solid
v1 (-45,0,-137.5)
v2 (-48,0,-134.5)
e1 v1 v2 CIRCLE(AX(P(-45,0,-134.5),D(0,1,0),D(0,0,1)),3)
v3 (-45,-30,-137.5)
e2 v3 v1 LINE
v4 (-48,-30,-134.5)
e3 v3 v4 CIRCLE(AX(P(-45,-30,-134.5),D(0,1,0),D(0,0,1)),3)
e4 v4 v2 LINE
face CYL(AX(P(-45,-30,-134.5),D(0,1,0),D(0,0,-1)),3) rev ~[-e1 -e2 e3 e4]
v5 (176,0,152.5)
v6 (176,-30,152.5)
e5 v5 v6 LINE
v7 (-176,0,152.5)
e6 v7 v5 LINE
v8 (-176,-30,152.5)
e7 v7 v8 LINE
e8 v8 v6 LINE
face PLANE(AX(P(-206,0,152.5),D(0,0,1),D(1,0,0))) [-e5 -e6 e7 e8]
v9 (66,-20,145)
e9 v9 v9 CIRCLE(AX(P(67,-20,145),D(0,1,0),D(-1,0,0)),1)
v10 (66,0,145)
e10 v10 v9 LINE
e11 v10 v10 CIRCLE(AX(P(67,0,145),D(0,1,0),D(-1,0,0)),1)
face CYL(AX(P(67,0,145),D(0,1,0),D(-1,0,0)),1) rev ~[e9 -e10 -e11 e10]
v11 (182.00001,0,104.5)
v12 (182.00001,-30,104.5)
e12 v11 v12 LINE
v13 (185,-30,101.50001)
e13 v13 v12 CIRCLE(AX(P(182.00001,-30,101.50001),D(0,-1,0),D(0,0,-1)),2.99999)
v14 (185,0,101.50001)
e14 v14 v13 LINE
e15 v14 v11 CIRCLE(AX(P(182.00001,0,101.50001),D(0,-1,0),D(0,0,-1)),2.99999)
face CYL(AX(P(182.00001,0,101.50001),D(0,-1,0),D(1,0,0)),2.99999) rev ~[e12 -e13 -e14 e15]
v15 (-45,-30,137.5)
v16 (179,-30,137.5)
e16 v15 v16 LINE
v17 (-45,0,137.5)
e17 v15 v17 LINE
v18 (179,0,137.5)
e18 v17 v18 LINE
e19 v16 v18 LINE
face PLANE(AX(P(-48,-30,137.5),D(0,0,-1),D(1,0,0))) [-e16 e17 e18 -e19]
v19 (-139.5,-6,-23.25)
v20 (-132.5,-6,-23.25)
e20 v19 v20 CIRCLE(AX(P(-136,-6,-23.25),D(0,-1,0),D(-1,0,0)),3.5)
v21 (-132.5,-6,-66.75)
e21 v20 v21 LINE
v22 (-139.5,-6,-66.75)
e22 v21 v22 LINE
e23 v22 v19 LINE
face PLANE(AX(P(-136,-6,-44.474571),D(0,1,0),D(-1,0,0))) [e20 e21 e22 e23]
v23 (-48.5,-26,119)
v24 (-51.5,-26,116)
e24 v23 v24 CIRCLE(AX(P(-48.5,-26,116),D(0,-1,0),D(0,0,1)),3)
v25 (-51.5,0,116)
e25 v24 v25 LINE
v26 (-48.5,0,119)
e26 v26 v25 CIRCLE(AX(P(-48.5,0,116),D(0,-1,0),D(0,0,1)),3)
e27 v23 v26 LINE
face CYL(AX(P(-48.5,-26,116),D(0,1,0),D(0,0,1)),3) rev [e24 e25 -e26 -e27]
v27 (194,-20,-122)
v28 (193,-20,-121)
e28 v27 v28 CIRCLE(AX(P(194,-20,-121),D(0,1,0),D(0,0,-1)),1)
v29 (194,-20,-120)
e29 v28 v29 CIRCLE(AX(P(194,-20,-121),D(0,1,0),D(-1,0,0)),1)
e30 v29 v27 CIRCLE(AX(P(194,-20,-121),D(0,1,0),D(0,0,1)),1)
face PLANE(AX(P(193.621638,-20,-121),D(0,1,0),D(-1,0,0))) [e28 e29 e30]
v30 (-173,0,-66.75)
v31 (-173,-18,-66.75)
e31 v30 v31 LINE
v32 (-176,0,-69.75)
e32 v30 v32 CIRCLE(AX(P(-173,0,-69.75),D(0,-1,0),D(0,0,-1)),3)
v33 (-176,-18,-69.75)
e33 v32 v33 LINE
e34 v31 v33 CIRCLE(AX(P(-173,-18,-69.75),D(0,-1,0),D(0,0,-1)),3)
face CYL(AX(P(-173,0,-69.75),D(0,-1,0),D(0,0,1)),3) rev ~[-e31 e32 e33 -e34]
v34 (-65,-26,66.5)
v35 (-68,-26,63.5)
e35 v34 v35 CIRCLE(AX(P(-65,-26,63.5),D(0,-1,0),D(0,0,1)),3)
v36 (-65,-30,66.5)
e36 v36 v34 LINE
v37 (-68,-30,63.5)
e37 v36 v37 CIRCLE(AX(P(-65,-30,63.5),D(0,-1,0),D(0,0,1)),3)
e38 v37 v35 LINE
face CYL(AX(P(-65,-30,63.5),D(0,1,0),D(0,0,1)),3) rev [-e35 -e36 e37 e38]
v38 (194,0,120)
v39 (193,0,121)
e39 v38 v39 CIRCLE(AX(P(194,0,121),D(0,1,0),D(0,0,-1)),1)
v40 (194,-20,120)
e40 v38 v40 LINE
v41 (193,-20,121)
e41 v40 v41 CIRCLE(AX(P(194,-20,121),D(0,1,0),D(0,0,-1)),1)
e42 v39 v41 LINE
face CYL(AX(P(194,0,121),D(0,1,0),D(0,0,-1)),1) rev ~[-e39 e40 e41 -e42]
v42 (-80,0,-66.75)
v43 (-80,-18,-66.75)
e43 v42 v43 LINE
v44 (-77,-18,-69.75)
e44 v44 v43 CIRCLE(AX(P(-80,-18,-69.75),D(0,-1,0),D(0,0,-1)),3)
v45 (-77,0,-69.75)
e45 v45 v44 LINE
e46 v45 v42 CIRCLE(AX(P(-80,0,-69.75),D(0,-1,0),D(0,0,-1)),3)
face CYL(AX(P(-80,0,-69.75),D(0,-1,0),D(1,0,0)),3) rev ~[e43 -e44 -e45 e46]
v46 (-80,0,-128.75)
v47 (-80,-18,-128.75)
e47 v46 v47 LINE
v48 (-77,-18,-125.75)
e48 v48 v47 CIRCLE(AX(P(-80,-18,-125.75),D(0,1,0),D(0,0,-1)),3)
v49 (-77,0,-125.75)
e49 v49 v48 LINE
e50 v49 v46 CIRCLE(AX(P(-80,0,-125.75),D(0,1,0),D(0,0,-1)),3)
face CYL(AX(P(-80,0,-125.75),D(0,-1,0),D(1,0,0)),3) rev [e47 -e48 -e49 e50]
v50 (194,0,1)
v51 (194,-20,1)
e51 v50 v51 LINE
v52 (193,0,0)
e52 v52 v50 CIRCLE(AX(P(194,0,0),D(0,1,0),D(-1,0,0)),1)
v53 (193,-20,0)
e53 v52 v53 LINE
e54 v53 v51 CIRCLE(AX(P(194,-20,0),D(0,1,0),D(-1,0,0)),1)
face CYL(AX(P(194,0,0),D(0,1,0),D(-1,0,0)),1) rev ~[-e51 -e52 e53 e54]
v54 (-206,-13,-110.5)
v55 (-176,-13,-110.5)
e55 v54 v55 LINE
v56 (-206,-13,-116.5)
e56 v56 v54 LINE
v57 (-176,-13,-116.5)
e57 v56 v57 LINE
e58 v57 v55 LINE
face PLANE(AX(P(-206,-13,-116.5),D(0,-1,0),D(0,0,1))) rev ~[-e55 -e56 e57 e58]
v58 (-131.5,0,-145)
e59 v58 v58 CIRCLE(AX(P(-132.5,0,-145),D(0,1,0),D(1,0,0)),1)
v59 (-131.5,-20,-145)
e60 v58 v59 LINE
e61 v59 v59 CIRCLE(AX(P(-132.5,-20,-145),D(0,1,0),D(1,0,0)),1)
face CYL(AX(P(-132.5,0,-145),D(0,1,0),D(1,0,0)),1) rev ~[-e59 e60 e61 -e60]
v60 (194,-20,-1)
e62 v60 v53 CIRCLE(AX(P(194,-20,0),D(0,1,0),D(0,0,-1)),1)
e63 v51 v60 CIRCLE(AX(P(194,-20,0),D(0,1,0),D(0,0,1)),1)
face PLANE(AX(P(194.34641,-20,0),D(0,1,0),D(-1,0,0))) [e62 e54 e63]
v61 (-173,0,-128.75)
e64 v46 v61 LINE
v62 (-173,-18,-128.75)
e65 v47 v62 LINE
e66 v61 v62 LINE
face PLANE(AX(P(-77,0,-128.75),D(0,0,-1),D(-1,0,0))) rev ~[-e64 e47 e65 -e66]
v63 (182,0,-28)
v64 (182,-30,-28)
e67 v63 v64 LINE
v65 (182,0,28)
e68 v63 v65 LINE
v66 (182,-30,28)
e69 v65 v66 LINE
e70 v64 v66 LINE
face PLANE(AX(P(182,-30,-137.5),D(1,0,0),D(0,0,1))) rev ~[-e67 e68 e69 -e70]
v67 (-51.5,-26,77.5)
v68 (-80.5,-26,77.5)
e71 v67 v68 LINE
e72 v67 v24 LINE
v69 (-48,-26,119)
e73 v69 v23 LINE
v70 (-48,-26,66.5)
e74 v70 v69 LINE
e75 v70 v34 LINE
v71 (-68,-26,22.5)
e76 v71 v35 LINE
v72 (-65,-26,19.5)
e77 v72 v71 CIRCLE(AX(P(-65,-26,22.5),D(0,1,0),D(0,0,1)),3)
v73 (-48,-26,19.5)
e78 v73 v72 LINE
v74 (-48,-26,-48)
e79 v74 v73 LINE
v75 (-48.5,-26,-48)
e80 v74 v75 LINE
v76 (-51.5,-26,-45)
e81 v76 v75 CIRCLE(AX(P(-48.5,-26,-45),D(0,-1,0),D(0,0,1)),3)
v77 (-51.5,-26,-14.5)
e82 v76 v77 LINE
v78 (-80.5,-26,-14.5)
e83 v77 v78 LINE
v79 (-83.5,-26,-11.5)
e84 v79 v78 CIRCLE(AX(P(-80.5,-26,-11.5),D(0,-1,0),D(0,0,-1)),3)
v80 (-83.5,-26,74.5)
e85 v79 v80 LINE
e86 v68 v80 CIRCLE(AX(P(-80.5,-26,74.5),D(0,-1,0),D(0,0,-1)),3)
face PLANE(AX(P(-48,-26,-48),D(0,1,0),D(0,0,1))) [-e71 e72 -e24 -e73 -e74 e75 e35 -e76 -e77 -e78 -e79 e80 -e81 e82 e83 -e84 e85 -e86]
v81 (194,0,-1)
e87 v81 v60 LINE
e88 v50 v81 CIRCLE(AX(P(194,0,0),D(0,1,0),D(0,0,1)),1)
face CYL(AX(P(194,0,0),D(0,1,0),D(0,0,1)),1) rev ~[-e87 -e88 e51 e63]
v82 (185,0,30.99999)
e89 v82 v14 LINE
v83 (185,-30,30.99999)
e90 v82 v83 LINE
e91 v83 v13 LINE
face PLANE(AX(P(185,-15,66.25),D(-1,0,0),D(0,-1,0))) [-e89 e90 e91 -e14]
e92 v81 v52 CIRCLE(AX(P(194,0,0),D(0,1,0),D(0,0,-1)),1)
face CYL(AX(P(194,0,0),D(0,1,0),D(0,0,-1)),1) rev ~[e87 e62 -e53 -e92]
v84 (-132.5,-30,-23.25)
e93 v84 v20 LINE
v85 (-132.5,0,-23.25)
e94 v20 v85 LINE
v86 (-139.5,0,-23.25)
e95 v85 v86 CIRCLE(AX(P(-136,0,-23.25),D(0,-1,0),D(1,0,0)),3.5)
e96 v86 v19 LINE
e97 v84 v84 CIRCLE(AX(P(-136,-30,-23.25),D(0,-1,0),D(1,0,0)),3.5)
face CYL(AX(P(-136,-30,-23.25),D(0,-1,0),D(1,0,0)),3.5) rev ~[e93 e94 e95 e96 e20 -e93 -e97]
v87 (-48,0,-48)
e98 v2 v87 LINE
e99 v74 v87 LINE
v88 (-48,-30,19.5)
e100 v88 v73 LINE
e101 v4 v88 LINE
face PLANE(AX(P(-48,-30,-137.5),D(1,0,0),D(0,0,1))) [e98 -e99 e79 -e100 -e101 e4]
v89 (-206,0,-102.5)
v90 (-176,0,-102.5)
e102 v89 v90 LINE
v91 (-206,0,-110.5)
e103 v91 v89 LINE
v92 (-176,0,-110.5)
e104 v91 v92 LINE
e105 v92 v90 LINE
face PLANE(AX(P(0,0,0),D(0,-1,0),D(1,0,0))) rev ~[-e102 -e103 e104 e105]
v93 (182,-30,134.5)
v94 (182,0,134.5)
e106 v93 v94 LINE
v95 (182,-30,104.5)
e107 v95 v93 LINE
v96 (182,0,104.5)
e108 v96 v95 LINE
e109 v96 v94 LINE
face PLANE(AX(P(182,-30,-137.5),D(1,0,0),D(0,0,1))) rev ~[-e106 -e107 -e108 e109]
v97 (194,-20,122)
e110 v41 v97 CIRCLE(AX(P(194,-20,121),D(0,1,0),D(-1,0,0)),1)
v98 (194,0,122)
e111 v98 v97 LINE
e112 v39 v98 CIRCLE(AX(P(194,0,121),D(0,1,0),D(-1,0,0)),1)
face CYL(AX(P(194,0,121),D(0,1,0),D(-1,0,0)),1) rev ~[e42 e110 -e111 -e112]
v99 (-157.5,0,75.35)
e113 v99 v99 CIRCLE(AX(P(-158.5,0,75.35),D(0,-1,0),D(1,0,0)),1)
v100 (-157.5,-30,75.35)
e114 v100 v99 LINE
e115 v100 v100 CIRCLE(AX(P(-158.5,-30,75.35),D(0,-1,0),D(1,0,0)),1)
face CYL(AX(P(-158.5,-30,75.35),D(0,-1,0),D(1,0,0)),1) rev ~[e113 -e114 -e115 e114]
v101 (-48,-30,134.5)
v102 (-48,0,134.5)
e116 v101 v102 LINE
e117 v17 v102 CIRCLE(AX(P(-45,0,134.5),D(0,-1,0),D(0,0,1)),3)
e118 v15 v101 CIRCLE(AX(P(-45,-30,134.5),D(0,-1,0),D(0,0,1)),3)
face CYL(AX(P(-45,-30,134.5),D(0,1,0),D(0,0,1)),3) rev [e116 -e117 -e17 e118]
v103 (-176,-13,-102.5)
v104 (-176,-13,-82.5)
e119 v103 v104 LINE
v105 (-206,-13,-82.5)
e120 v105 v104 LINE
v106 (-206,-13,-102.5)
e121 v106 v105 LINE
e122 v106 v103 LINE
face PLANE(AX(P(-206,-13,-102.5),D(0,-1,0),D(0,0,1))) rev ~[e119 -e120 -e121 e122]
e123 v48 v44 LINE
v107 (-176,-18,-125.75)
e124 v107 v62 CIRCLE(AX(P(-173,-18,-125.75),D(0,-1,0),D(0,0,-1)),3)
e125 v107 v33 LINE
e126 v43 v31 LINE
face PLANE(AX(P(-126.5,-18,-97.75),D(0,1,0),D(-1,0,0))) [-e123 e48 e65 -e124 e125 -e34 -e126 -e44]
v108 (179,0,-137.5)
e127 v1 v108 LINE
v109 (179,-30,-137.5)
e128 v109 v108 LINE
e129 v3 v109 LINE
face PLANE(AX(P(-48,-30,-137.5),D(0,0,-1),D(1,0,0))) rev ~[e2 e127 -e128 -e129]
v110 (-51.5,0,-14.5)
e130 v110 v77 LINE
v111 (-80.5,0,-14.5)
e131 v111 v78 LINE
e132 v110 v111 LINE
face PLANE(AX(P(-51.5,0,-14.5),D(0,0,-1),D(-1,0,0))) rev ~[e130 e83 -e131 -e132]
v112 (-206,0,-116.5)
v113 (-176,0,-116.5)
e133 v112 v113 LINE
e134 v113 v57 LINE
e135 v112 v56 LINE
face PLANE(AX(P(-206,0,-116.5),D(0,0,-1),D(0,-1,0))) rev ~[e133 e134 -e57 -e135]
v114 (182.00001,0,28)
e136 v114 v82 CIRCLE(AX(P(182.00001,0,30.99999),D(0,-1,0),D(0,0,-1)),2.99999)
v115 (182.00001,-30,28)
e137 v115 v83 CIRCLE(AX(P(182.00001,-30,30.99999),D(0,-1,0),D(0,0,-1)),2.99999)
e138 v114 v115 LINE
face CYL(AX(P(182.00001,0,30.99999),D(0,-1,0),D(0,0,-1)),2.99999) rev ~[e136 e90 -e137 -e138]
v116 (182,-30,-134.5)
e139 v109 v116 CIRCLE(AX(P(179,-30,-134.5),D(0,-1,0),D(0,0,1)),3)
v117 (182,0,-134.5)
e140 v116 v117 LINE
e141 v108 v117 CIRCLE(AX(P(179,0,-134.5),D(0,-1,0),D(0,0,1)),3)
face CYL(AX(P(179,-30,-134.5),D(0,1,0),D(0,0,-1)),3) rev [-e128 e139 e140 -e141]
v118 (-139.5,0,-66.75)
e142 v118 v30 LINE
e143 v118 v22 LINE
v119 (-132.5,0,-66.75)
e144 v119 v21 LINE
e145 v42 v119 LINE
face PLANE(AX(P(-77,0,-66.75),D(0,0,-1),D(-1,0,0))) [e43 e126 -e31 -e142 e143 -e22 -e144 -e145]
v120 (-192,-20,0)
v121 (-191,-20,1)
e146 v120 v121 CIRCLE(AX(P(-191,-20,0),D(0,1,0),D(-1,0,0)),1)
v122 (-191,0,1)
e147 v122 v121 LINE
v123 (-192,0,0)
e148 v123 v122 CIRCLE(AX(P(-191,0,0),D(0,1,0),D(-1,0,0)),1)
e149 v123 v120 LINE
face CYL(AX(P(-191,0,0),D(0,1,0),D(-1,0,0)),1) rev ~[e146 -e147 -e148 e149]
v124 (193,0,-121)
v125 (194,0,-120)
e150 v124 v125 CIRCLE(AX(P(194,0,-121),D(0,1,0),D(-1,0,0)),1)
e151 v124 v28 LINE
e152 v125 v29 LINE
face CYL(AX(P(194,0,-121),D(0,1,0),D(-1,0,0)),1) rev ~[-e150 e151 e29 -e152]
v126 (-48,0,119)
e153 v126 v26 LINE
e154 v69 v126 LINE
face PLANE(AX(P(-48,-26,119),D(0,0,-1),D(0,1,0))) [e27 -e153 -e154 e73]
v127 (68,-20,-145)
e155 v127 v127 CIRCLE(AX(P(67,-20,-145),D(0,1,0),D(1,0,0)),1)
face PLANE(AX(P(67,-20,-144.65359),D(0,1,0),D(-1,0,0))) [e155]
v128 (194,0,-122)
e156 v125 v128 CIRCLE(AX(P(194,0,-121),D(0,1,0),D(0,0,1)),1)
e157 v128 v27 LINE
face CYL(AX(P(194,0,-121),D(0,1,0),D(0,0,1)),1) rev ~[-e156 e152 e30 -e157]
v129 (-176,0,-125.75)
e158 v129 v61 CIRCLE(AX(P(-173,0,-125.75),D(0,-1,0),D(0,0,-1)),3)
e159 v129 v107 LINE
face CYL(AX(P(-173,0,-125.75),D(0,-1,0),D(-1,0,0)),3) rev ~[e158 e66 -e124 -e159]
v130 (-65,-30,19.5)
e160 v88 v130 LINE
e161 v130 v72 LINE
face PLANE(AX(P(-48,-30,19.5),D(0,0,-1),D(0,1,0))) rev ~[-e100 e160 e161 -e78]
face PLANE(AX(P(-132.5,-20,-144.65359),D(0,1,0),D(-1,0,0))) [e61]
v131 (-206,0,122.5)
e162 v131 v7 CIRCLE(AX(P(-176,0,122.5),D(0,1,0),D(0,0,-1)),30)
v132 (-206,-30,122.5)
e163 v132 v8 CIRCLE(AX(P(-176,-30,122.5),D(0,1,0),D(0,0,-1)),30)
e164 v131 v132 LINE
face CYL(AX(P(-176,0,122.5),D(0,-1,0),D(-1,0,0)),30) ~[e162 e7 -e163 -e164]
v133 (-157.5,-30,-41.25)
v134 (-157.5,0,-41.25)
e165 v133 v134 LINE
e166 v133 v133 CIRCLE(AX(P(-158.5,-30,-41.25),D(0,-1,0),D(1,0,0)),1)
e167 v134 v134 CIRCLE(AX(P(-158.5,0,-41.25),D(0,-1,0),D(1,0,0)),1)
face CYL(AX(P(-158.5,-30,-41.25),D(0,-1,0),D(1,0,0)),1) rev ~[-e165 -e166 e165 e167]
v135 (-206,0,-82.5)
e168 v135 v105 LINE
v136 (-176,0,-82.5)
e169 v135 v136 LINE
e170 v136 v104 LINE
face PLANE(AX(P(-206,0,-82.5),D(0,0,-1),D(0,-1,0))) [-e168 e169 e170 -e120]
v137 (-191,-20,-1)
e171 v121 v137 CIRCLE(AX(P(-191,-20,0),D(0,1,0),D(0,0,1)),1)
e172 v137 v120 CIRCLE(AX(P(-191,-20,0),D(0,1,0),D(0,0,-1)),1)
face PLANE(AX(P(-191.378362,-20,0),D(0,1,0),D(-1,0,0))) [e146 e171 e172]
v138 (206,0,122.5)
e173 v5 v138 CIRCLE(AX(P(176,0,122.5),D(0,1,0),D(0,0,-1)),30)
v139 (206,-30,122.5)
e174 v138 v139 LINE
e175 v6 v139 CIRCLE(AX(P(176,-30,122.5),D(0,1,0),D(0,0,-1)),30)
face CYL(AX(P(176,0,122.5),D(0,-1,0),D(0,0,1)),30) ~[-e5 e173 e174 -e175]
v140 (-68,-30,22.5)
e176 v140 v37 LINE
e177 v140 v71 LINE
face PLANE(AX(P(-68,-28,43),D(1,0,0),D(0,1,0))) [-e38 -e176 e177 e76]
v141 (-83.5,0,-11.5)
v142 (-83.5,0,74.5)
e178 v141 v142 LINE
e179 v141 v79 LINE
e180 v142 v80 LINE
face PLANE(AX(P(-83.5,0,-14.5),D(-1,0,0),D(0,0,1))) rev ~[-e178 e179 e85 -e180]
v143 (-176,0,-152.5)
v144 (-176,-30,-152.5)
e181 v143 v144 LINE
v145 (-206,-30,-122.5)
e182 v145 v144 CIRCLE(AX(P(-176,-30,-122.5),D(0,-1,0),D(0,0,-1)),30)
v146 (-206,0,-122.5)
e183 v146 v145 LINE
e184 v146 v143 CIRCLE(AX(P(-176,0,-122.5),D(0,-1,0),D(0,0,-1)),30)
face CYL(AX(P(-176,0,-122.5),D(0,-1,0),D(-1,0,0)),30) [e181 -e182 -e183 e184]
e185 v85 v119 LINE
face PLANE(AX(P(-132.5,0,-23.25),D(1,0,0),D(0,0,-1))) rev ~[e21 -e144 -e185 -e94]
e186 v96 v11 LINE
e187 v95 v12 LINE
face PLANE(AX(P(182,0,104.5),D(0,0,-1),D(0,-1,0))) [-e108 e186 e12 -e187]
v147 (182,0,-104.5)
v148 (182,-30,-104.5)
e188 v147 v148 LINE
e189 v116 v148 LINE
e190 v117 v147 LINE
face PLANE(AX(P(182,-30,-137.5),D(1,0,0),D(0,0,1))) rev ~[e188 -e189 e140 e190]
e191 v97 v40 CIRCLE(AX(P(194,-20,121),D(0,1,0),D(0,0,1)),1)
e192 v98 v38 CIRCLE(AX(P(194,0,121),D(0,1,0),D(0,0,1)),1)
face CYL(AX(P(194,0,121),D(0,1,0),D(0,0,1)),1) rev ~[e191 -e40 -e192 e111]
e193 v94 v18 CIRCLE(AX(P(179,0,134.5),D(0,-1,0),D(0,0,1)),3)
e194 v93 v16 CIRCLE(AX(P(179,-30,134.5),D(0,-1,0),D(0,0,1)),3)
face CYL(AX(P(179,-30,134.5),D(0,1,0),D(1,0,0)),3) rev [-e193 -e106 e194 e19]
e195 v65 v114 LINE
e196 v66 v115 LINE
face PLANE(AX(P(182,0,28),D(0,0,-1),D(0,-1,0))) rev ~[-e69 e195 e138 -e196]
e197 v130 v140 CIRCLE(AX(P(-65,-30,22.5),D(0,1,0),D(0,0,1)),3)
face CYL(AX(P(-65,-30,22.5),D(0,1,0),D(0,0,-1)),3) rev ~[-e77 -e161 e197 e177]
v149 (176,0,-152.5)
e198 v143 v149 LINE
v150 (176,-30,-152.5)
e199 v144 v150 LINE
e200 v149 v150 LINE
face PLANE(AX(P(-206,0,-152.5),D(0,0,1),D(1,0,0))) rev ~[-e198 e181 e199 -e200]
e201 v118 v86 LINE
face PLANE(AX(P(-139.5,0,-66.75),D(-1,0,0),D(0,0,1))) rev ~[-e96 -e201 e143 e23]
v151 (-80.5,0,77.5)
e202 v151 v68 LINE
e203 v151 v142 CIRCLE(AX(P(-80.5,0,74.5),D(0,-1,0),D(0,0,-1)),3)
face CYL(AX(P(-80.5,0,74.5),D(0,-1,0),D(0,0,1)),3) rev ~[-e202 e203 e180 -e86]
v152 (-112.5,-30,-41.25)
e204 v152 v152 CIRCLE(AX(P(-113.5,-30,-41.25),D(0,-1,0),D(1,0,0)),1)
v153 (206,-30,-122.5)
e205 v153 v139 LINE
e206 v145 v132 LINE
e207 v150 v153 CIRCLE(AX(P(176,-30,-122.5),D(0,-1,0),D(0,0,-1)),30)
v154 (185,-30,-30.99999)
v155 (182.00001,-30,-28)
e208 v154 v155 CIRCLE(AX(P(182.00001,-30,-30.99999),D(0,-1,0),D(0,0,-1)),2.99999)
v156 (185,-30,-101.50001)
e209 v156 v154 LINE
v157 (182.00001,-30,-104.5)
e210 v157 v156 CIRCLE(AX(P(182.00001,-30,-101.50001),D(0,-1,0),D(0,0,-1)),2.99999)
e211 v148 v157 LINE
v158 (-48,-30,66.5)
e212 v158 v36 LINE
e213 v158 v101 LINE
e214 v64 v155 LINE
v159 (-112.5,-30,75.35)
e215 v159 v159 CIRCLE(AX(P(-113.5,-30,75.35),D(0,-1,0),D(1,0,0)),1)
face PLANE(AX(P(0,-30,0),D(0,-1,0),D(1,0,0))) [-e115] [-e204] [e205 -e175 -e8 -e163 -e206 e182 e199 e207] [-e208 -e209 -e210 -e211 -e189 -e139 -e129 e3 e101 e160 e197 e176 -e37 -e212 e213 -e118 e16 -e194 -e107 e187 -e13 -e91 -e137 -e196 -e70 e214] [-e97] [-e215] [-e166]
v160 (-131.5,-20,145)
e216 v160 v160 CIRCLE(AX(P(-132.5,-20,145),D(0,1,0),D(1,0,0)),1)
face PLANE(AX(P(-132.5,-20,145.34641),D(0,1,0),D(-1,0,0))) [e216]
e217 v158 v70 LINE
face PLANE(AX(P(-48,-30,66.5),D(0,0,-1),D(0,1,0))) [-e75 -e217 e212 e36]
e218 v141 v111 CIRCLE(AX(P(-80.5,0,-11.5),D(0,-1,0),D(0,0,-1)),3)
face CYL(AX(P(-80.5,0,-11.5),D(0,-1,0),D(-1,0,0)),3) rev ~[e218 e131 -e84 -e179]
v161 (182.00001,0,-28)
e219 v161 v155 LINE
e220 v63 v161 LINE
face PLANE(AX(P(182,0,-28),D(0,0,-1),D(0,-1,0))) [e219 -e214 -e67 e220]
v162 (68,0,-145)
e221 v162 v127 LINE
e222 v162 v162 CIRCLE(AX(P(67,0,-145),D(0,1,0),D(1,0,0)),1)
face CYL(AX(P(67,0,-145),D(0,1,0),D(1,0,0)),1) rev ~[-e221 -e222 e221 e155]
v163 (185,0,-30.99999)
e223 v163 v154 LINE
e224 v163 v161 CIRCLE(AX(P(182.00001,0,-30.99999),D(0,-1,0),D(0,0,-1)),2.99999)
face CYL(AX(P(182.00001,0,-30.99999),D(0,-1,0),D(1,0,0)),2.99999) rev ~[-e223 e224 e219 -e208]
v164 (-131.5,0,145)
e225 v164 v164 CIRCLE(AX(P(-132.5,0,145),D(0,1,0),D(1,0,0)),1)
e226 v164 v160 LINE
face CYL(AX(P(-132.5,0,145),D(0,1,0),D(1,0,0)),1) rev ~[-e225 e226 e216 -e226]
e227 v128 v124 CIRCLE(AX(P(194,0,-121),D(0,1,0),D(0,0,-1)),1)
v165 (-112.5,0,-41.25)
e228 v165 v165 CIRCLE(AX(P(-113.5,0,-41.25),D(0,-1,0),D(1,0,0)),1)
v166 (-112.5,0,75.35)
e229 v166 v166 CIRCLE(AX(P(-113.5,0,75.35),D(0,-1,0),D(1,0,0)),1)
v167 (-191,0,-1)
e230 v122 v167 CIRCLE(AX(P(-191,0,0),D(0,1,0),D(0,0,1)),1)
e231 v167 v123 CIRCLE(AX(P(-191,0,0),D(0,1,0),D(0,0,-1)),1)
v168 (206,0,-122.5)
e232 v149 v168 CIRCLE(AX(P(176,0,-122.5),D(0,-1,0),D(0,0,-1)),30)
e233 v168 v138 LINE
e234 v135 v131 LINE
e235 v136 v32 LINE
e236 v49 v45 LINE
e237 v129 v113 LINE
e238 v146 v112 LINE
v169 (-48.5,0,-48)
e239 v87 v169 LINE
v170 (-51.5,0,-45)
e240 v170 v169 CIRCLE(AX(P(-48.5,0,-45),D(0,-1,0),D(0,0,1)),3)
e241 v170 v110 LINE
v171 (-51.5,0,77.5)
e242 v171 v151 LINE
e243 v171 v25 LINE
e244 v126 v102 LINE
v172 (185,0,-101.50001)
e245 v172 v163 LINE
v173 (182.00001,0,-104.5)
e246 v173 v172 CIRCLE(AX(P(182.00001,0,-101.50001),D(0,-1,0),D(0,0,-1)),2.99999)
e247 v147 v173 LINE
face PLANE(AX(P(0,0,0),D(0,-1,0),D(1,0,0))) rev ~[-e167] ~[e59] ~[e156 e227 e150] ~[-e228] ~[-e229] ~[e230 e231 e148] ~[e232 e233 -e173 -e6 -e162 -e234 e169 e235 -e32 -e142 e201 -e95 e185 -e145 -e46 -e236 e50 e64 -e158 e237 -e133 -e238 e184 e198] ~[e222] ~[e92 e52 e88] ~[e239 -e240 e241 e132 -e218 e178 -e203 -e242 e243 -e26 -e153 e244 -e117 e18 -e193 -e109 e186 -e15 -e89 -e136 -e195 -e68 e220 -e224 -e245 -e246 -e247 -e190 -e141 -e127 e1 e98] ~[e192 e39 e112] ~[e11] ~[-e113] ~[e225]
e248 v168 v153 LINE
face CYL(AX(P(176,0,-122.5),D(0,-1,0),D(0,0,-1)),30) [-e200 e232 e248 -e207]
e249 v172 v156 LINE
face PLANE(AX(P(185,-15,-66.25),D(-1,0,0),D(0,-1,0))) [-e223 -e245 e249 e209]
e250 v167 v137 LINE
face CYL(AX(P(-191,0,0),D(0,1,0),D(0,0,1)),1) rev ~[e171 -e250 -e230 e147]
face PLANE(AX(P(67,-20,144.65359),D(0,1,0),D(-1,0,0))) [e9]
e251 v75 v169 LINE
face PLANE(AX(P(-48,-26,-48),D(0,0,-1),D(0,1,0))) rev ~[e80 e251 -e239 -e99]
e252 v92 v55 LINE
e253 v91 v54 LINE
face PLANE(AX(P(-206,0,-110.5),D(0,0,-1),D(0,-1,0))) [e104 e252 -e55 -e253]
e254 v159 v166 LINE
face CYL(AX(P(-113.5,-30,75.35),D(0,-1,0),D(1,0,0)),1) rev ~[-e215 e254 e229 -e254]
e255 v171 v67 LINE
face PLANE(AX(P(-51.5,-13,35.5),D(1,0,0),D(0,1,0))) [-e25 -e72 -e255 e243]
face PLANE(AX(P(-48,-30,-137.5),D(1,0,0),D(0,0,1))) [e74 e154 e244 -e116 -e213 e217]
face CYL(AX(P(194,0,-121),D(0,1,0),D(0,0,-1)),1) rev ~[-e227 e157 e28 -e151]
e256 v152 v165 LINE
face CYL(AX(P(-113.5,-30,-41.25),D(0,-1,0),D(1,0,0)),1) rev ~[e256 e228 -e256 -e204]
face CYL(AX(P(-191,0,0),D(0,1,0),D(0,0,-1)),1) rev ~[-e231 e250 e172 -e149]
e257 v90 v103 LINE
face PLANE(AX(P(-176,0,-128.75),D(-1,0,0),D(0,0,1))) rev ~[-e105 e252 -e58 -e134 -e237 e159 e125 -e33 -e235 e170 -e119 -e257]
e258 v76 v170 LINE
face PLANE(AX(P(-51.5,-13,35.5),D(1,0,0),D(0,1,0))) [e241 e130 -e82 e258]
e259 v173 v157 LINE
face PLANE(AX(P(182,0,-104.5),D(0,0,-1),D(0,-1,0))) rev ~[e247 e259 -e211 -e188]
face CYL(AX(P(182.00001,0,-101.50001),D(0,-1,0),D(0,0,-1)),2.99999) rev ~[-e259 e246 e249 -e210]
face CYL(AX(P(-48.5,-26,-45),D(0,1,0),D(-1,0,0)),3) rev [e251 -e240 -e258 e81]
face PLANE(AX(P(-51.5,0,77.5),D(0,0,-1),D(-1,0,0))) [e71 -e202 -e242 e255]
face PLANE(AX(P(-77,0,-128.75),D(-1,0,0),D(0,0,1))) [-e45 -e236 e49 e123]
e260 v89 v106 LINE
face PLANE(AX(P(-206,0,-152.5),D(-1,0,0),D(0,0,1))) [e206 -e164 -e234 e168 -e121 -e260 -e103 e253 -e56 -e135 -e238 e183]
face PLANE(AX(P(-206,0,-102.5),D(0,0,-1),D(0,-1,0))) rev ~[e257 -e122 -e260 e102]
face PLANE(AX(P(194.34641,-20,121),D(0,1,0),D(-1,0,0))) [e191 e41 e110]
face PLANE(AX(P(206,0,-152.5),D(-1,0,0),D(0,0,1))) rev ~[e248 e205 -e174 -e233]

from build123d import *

# Parameters (mm, degrees)
F0_W      = 412
F0_H      = 305
F1_DEPTH  = 30
F2_W      = 230
F2_H      = 275
F3_DEPTH  = 30
F4_R      = 3
F5_R      = 30
F6_W      = 26
F6_H      = 167
F7_DEPTH  = 3.5
F8_R      = 3
F10_W     = 32
F10_H     = 92
F11_DEPTH = 26
F12_R     = 3
F13_W     = 4
F13_H     = 47
F14_DEPTH = 20
F15_R     = 3
F16_W     = 30
F16_H     = 76.5
F17_DEPTH = 3
F18_R     = 2.99999
F19_R     = 3.5
F20_DEPTH = 30
F21_W     = 99
F21_H     = 62
F22_DEPTH = 18
F23_R     = 3
F25_DEPTH = 6
F26_W     = 13
F26_H     = 20
F26_H_2   = 6
F27_DEPTH = 30
F28_R     = 1
F29_DEPTH = 30
F31_DEPTH = 20


# Not quite as in the source:
# - a fillet or chamfer is up to 0.001 mm smaller than in the source, because OpenCascade refuses the exact size
# - a feature names something its author has since deleted; it is built from what else it names


with BuildPart() as f1:
    # F0 (on Front) → F1 (new body)
    with BuildSketch(Plane.XZ):
        Rectangle(F0_W, F0_H)
    extrude(amount=F1_DEPTH)

    # F2 (on face) → F3 (cut, through all)
    with BuildSketch(Plane.XZ.offset(30)):
        with Locations((67, 0)):
            Rectangle(F2_W, F2_H)
    extrude(amount=-F3_DEPTH, mode=Mode.SUBTRACT)

    # F4
    f4_edges = [f1.edges().sort_by_distance(p)[0] for p in [
        (-48, -15, 137.5),
        (182, -15, 137.5),
        (182, -15, -137.5),
        (-48, -15, -137.5),
    ]]
    fillet(f4_edges, radius=F4_R)

    # F5
    f5_edges = [f1.edges().sort_by_distance(p)[0] for p in [
        (-206, -15, -152.5),
        (-206, -15, 152.5),
        (206, -15, 152.5),
        (206, -15, -152.5),
    ]]
    fillet(f5_edges, radius=F5_R)

    # F6 (on face) → F7 (cut)
    with BuildSketch(Plane.YZ.offset(-48)):
        with Locations((-13, 35.5)):
            Rectangle(F6_W, F6_H)
    extrude(amount=-F7_DEPTH, mode=Mode.SUBTRACT)

    # F8
    f8_edges = [f1.edges().sort_by_distance(p)[0] for p in [
        (-51.5, -13, -48),
        (-51.5, -13, 119),
    ]]
    fillet(f8_edges, radius=F8_R)

    # F10 (on face) → F11 (cut)
    with BuildSketch(Plane(origin=(0, 0, 0), x_dir=(-1, 0, 0), z_dir=(0, 1, 0))):
        with Locations((67.5, 31.5)):
            Rectangle(F10_W, F10_H)
    extrude(amount=-F11_DEPTH, mode=Mode.SUBTRACT)

    # F12
    f12_edges = [f1.edges().sort_by_distance(p)[0] for p in [
        (-83.5, -13, -14.5),
        (-83.5, -13, 77.5),
    ]]
    fillet(f12_edges, radius=F12_R)

    # F13 (on face) → F14 (cut)
    with BuildSketch(Plane.YZ.offset(-48)):
        with Locations((-28, 43)):
            Rectangle(F13_W, F13_H)
    extrude(amount=-F14_DEPTH, mode=Mode.SUBTRACT)

    # F15
    f15_edges = [f1.edges().sort_by_distance(p)[0] for p in [
        (-68, -28, 19.5),
        (-68, -28, 66.5),
    ]]
    fillet(f15_edges, radius=F15_R)

    # F16 (on face) → F17 (cut)
    with BuildSketch(Plane(origin=(182, 0, 0), x_dir=(0, -1, 0), z_dir=(-1, 0, 0))):
        with Locations((15, -66.25)):
            Rectangle(F16_W, F16_H)
        with Locations((15, 66.25)):
            Rectangle(F16_W, F16_H)
    extrude(amount=-F17_DEPTH, mode=Mode.SUBTRACT)

    # F18 (radius 3 in the source; OpenCascade refuses exactly that, so slightly less here)
    f18_edges = [f1.edges().sort_by_distance(p)[0] for p in [
        (185, -15, -104.5),
        (185, -15, 28),
        (185, -15, 104.5),
        (185, -15, -28),
    ]]
    fillet(f18_edges, radius=F18_R)

    # F19 (on face) → F20 (cut)
    with BuildSketch(Plane.XZ.offset(30)):
        with Locations((-136, -23.25)):
            Circle(F19_R)
    extrude(amount=-F20_DEPTH, mode=Mode.SUBTRACT)

    # F21 (on face) → F22 (cut)
    with BuildSketch(Plane(origin=(0, 0, 0), x_dir=(-1, 0, 0), z_dir=(0, 1, 0))):
        with Locations((126.5, -97.75)):
            Rectangle(F21_W, F21_H)
    extrude(amount=-F22_DEPTH, mode=Mode.SUBTRACT)

    # F23
    f23_edges = [f1.edges().sort_by_distance(p)[0] for p in [
        (-176, -9, -128.75),
        (-77, -9, -128.75),
        (-77, -9, -66.75),
        (-176, -9, -66.75),
    ]]
    fillet(f23_edges, radius=F23_R)

    # F24 (on face) → F25 (cut)
    with BuildSketch(Plane(origin=(0, 0, 0), x_dir=(-1, 0, 0), z_dir=(0, 1, 0))):
        with BuildLine():
            ThreePointArc((139.5, -23.25), (136, -26.75), (132.5, -23.25))
            Line((132.5, -23.25), (132.5, -66.75))
            Line((132.5, -66.75), (139.5, -66.75))
            Line((139.5, -66.75), (139.5, -23.25))
        make_face()
    extrude(amount=-F25_DEPTH, mode=Mode.SUBTRACT)

    # F26 (on face) → F27 (cut)
    with BuildSketch(Plane(origin=(-206, 0, 0), x_dir=(0, -1, 0), z_dir=(-1, 0, 0))):
        with Locations((6.5, -92.5)):
            Rectangle(F26_W, F26_H)
        with Locations((6.5, -113.5)):
            Rectangle(F26_W, F26_H_2)
    extrude(amount=-F27_DEPTH, mode=Mode.SUBTRACT)

    # F28 (on face) → F29 (cut)
    with BuildSketch(Plane.XZ.offset(30)):
        with Locations((-158.5, 75.35)):
            Circle(F28_R)
        with Locations((-158.5, -41.25)):
            Circle(F28_R)
        with Locations((-113.5, -41.25)):
            Circle(F28_R)
        with Locations((-113.5, 75.35)):
            Circle(F28_R)
    extrude(amount=-F29_DEPTH, mode=Mode.SUBTRACT)

    # F30 (on face) → F31 (cut)
    with BuildSketch(Plane(origin=(0, 0, 0), x_dir=(-1, 0, 0), z_dir=(0, 1, 0))):
        with BuildLine():
            Line((-194, 120), (-194, 122))
            ThreePointArc((-194, 122), (-195, 121), (-194, 120))
        make_face()
        with BuildLine():
            ThreePointArc((-193, 121), (-193.2928932188, 121.7071067812), (-194, 122))
            Line((-194, 122), (-194, 120))
            ThreePointArc((-194, 120), (-193.2928932188, 120.2928932188), (-193, 121))
        make_face()
        with BuildLine():
            ThreePointArc((-68, 145), (-67, 144), (-66, 145))
            Line((-66, 145), (-68, 145))
        make_face()
        with BuildLine():
            Line((-68, 145), (-66, 145))
            ThreePointArc((-66, 145), (-67, 146), (-68, 145))
        make_face()
        with BuildLine():
            Line((131.5, 145), (133.5, 145))
            ThreePointArc((133.5, 145), (132.5, 146), (131.5, 145))
        make_face()
        with BuildLine():
            ThreePointArc((131.5, 145), (132.5, 144), (133.5, 145))
            Line((133.5, 145), (131.5, 145))
        make_face()
        with BuildLine():
            ThreePointArc((192, 0), (191.7071067812, 0.7071067812), (191, 1))
            Line((191, 1), (191, -1))
            ThreePointArc((191, -1), (191.7071067812, -0.7071067812), (192, 0))
        make_face()
        with BuildLine():
            Line((191, -1), (191, 1))
            ThreePointArc((191, 1), (190, 0), (191, -1))
        make_face()
        with BuildLine():
            Line((131.5, -145), (133.5, -145))
            ThreePointArc((133.5, -145), (132.5, -144), (131.5, -145))
        make_face()
        with BuildLine():
            ThreePointArc((131.5, -145), (132.5, -146), (133.5, -145))
            Line((133.5, -145), (131.5, -145))
        make_face()
        with BuildLine():
            Line((-68, -145), (-66, -145))
            ThreePointArc((-66, -145), (-67, -144), (-68, -145))
        make_face()
        with BuildLine():
            ThreePointArc((-68, -145), (-67, -146), (-66, -145))
            Line((-66, -145), (-68, -145))
        make_face()
        with BuildLine():
            ThreePointArc((-193, -121), (-193.2928932188, -120.2928932188), (-194, -120))
            Line((-194, -120), (-194, -122))
            ThreePointArc((-194, -122), (-193.2928932188, -121.7071067812), (-193, -121))
        make_face()
        with BuildLine():
            Line((-194, -122), (-194, -120))
            ThreePointArc((-194, -120), (-195, -121), (-194, -122))
        make_face()
        with BuildLine():
            Line((-194, -1), (-194, 1))
            ThreePointArc((-194, 1), (-195, 0), (-194, -1))
        make_face()
        with BuildLine():
            ThreePointArc((-193, 0), (-193.2928932188, 0.7071067812), (-194, 1))
            Line((-194, 1), (-194, -1))
            ThreePointArc((-194, -1), (-193.2928932188, -0.7071067812), (-193, 0))
        make_face()
    extrude(amount=-F31_DEPTH, mode=Mode.SUBTRACT)


solid = f1.part
